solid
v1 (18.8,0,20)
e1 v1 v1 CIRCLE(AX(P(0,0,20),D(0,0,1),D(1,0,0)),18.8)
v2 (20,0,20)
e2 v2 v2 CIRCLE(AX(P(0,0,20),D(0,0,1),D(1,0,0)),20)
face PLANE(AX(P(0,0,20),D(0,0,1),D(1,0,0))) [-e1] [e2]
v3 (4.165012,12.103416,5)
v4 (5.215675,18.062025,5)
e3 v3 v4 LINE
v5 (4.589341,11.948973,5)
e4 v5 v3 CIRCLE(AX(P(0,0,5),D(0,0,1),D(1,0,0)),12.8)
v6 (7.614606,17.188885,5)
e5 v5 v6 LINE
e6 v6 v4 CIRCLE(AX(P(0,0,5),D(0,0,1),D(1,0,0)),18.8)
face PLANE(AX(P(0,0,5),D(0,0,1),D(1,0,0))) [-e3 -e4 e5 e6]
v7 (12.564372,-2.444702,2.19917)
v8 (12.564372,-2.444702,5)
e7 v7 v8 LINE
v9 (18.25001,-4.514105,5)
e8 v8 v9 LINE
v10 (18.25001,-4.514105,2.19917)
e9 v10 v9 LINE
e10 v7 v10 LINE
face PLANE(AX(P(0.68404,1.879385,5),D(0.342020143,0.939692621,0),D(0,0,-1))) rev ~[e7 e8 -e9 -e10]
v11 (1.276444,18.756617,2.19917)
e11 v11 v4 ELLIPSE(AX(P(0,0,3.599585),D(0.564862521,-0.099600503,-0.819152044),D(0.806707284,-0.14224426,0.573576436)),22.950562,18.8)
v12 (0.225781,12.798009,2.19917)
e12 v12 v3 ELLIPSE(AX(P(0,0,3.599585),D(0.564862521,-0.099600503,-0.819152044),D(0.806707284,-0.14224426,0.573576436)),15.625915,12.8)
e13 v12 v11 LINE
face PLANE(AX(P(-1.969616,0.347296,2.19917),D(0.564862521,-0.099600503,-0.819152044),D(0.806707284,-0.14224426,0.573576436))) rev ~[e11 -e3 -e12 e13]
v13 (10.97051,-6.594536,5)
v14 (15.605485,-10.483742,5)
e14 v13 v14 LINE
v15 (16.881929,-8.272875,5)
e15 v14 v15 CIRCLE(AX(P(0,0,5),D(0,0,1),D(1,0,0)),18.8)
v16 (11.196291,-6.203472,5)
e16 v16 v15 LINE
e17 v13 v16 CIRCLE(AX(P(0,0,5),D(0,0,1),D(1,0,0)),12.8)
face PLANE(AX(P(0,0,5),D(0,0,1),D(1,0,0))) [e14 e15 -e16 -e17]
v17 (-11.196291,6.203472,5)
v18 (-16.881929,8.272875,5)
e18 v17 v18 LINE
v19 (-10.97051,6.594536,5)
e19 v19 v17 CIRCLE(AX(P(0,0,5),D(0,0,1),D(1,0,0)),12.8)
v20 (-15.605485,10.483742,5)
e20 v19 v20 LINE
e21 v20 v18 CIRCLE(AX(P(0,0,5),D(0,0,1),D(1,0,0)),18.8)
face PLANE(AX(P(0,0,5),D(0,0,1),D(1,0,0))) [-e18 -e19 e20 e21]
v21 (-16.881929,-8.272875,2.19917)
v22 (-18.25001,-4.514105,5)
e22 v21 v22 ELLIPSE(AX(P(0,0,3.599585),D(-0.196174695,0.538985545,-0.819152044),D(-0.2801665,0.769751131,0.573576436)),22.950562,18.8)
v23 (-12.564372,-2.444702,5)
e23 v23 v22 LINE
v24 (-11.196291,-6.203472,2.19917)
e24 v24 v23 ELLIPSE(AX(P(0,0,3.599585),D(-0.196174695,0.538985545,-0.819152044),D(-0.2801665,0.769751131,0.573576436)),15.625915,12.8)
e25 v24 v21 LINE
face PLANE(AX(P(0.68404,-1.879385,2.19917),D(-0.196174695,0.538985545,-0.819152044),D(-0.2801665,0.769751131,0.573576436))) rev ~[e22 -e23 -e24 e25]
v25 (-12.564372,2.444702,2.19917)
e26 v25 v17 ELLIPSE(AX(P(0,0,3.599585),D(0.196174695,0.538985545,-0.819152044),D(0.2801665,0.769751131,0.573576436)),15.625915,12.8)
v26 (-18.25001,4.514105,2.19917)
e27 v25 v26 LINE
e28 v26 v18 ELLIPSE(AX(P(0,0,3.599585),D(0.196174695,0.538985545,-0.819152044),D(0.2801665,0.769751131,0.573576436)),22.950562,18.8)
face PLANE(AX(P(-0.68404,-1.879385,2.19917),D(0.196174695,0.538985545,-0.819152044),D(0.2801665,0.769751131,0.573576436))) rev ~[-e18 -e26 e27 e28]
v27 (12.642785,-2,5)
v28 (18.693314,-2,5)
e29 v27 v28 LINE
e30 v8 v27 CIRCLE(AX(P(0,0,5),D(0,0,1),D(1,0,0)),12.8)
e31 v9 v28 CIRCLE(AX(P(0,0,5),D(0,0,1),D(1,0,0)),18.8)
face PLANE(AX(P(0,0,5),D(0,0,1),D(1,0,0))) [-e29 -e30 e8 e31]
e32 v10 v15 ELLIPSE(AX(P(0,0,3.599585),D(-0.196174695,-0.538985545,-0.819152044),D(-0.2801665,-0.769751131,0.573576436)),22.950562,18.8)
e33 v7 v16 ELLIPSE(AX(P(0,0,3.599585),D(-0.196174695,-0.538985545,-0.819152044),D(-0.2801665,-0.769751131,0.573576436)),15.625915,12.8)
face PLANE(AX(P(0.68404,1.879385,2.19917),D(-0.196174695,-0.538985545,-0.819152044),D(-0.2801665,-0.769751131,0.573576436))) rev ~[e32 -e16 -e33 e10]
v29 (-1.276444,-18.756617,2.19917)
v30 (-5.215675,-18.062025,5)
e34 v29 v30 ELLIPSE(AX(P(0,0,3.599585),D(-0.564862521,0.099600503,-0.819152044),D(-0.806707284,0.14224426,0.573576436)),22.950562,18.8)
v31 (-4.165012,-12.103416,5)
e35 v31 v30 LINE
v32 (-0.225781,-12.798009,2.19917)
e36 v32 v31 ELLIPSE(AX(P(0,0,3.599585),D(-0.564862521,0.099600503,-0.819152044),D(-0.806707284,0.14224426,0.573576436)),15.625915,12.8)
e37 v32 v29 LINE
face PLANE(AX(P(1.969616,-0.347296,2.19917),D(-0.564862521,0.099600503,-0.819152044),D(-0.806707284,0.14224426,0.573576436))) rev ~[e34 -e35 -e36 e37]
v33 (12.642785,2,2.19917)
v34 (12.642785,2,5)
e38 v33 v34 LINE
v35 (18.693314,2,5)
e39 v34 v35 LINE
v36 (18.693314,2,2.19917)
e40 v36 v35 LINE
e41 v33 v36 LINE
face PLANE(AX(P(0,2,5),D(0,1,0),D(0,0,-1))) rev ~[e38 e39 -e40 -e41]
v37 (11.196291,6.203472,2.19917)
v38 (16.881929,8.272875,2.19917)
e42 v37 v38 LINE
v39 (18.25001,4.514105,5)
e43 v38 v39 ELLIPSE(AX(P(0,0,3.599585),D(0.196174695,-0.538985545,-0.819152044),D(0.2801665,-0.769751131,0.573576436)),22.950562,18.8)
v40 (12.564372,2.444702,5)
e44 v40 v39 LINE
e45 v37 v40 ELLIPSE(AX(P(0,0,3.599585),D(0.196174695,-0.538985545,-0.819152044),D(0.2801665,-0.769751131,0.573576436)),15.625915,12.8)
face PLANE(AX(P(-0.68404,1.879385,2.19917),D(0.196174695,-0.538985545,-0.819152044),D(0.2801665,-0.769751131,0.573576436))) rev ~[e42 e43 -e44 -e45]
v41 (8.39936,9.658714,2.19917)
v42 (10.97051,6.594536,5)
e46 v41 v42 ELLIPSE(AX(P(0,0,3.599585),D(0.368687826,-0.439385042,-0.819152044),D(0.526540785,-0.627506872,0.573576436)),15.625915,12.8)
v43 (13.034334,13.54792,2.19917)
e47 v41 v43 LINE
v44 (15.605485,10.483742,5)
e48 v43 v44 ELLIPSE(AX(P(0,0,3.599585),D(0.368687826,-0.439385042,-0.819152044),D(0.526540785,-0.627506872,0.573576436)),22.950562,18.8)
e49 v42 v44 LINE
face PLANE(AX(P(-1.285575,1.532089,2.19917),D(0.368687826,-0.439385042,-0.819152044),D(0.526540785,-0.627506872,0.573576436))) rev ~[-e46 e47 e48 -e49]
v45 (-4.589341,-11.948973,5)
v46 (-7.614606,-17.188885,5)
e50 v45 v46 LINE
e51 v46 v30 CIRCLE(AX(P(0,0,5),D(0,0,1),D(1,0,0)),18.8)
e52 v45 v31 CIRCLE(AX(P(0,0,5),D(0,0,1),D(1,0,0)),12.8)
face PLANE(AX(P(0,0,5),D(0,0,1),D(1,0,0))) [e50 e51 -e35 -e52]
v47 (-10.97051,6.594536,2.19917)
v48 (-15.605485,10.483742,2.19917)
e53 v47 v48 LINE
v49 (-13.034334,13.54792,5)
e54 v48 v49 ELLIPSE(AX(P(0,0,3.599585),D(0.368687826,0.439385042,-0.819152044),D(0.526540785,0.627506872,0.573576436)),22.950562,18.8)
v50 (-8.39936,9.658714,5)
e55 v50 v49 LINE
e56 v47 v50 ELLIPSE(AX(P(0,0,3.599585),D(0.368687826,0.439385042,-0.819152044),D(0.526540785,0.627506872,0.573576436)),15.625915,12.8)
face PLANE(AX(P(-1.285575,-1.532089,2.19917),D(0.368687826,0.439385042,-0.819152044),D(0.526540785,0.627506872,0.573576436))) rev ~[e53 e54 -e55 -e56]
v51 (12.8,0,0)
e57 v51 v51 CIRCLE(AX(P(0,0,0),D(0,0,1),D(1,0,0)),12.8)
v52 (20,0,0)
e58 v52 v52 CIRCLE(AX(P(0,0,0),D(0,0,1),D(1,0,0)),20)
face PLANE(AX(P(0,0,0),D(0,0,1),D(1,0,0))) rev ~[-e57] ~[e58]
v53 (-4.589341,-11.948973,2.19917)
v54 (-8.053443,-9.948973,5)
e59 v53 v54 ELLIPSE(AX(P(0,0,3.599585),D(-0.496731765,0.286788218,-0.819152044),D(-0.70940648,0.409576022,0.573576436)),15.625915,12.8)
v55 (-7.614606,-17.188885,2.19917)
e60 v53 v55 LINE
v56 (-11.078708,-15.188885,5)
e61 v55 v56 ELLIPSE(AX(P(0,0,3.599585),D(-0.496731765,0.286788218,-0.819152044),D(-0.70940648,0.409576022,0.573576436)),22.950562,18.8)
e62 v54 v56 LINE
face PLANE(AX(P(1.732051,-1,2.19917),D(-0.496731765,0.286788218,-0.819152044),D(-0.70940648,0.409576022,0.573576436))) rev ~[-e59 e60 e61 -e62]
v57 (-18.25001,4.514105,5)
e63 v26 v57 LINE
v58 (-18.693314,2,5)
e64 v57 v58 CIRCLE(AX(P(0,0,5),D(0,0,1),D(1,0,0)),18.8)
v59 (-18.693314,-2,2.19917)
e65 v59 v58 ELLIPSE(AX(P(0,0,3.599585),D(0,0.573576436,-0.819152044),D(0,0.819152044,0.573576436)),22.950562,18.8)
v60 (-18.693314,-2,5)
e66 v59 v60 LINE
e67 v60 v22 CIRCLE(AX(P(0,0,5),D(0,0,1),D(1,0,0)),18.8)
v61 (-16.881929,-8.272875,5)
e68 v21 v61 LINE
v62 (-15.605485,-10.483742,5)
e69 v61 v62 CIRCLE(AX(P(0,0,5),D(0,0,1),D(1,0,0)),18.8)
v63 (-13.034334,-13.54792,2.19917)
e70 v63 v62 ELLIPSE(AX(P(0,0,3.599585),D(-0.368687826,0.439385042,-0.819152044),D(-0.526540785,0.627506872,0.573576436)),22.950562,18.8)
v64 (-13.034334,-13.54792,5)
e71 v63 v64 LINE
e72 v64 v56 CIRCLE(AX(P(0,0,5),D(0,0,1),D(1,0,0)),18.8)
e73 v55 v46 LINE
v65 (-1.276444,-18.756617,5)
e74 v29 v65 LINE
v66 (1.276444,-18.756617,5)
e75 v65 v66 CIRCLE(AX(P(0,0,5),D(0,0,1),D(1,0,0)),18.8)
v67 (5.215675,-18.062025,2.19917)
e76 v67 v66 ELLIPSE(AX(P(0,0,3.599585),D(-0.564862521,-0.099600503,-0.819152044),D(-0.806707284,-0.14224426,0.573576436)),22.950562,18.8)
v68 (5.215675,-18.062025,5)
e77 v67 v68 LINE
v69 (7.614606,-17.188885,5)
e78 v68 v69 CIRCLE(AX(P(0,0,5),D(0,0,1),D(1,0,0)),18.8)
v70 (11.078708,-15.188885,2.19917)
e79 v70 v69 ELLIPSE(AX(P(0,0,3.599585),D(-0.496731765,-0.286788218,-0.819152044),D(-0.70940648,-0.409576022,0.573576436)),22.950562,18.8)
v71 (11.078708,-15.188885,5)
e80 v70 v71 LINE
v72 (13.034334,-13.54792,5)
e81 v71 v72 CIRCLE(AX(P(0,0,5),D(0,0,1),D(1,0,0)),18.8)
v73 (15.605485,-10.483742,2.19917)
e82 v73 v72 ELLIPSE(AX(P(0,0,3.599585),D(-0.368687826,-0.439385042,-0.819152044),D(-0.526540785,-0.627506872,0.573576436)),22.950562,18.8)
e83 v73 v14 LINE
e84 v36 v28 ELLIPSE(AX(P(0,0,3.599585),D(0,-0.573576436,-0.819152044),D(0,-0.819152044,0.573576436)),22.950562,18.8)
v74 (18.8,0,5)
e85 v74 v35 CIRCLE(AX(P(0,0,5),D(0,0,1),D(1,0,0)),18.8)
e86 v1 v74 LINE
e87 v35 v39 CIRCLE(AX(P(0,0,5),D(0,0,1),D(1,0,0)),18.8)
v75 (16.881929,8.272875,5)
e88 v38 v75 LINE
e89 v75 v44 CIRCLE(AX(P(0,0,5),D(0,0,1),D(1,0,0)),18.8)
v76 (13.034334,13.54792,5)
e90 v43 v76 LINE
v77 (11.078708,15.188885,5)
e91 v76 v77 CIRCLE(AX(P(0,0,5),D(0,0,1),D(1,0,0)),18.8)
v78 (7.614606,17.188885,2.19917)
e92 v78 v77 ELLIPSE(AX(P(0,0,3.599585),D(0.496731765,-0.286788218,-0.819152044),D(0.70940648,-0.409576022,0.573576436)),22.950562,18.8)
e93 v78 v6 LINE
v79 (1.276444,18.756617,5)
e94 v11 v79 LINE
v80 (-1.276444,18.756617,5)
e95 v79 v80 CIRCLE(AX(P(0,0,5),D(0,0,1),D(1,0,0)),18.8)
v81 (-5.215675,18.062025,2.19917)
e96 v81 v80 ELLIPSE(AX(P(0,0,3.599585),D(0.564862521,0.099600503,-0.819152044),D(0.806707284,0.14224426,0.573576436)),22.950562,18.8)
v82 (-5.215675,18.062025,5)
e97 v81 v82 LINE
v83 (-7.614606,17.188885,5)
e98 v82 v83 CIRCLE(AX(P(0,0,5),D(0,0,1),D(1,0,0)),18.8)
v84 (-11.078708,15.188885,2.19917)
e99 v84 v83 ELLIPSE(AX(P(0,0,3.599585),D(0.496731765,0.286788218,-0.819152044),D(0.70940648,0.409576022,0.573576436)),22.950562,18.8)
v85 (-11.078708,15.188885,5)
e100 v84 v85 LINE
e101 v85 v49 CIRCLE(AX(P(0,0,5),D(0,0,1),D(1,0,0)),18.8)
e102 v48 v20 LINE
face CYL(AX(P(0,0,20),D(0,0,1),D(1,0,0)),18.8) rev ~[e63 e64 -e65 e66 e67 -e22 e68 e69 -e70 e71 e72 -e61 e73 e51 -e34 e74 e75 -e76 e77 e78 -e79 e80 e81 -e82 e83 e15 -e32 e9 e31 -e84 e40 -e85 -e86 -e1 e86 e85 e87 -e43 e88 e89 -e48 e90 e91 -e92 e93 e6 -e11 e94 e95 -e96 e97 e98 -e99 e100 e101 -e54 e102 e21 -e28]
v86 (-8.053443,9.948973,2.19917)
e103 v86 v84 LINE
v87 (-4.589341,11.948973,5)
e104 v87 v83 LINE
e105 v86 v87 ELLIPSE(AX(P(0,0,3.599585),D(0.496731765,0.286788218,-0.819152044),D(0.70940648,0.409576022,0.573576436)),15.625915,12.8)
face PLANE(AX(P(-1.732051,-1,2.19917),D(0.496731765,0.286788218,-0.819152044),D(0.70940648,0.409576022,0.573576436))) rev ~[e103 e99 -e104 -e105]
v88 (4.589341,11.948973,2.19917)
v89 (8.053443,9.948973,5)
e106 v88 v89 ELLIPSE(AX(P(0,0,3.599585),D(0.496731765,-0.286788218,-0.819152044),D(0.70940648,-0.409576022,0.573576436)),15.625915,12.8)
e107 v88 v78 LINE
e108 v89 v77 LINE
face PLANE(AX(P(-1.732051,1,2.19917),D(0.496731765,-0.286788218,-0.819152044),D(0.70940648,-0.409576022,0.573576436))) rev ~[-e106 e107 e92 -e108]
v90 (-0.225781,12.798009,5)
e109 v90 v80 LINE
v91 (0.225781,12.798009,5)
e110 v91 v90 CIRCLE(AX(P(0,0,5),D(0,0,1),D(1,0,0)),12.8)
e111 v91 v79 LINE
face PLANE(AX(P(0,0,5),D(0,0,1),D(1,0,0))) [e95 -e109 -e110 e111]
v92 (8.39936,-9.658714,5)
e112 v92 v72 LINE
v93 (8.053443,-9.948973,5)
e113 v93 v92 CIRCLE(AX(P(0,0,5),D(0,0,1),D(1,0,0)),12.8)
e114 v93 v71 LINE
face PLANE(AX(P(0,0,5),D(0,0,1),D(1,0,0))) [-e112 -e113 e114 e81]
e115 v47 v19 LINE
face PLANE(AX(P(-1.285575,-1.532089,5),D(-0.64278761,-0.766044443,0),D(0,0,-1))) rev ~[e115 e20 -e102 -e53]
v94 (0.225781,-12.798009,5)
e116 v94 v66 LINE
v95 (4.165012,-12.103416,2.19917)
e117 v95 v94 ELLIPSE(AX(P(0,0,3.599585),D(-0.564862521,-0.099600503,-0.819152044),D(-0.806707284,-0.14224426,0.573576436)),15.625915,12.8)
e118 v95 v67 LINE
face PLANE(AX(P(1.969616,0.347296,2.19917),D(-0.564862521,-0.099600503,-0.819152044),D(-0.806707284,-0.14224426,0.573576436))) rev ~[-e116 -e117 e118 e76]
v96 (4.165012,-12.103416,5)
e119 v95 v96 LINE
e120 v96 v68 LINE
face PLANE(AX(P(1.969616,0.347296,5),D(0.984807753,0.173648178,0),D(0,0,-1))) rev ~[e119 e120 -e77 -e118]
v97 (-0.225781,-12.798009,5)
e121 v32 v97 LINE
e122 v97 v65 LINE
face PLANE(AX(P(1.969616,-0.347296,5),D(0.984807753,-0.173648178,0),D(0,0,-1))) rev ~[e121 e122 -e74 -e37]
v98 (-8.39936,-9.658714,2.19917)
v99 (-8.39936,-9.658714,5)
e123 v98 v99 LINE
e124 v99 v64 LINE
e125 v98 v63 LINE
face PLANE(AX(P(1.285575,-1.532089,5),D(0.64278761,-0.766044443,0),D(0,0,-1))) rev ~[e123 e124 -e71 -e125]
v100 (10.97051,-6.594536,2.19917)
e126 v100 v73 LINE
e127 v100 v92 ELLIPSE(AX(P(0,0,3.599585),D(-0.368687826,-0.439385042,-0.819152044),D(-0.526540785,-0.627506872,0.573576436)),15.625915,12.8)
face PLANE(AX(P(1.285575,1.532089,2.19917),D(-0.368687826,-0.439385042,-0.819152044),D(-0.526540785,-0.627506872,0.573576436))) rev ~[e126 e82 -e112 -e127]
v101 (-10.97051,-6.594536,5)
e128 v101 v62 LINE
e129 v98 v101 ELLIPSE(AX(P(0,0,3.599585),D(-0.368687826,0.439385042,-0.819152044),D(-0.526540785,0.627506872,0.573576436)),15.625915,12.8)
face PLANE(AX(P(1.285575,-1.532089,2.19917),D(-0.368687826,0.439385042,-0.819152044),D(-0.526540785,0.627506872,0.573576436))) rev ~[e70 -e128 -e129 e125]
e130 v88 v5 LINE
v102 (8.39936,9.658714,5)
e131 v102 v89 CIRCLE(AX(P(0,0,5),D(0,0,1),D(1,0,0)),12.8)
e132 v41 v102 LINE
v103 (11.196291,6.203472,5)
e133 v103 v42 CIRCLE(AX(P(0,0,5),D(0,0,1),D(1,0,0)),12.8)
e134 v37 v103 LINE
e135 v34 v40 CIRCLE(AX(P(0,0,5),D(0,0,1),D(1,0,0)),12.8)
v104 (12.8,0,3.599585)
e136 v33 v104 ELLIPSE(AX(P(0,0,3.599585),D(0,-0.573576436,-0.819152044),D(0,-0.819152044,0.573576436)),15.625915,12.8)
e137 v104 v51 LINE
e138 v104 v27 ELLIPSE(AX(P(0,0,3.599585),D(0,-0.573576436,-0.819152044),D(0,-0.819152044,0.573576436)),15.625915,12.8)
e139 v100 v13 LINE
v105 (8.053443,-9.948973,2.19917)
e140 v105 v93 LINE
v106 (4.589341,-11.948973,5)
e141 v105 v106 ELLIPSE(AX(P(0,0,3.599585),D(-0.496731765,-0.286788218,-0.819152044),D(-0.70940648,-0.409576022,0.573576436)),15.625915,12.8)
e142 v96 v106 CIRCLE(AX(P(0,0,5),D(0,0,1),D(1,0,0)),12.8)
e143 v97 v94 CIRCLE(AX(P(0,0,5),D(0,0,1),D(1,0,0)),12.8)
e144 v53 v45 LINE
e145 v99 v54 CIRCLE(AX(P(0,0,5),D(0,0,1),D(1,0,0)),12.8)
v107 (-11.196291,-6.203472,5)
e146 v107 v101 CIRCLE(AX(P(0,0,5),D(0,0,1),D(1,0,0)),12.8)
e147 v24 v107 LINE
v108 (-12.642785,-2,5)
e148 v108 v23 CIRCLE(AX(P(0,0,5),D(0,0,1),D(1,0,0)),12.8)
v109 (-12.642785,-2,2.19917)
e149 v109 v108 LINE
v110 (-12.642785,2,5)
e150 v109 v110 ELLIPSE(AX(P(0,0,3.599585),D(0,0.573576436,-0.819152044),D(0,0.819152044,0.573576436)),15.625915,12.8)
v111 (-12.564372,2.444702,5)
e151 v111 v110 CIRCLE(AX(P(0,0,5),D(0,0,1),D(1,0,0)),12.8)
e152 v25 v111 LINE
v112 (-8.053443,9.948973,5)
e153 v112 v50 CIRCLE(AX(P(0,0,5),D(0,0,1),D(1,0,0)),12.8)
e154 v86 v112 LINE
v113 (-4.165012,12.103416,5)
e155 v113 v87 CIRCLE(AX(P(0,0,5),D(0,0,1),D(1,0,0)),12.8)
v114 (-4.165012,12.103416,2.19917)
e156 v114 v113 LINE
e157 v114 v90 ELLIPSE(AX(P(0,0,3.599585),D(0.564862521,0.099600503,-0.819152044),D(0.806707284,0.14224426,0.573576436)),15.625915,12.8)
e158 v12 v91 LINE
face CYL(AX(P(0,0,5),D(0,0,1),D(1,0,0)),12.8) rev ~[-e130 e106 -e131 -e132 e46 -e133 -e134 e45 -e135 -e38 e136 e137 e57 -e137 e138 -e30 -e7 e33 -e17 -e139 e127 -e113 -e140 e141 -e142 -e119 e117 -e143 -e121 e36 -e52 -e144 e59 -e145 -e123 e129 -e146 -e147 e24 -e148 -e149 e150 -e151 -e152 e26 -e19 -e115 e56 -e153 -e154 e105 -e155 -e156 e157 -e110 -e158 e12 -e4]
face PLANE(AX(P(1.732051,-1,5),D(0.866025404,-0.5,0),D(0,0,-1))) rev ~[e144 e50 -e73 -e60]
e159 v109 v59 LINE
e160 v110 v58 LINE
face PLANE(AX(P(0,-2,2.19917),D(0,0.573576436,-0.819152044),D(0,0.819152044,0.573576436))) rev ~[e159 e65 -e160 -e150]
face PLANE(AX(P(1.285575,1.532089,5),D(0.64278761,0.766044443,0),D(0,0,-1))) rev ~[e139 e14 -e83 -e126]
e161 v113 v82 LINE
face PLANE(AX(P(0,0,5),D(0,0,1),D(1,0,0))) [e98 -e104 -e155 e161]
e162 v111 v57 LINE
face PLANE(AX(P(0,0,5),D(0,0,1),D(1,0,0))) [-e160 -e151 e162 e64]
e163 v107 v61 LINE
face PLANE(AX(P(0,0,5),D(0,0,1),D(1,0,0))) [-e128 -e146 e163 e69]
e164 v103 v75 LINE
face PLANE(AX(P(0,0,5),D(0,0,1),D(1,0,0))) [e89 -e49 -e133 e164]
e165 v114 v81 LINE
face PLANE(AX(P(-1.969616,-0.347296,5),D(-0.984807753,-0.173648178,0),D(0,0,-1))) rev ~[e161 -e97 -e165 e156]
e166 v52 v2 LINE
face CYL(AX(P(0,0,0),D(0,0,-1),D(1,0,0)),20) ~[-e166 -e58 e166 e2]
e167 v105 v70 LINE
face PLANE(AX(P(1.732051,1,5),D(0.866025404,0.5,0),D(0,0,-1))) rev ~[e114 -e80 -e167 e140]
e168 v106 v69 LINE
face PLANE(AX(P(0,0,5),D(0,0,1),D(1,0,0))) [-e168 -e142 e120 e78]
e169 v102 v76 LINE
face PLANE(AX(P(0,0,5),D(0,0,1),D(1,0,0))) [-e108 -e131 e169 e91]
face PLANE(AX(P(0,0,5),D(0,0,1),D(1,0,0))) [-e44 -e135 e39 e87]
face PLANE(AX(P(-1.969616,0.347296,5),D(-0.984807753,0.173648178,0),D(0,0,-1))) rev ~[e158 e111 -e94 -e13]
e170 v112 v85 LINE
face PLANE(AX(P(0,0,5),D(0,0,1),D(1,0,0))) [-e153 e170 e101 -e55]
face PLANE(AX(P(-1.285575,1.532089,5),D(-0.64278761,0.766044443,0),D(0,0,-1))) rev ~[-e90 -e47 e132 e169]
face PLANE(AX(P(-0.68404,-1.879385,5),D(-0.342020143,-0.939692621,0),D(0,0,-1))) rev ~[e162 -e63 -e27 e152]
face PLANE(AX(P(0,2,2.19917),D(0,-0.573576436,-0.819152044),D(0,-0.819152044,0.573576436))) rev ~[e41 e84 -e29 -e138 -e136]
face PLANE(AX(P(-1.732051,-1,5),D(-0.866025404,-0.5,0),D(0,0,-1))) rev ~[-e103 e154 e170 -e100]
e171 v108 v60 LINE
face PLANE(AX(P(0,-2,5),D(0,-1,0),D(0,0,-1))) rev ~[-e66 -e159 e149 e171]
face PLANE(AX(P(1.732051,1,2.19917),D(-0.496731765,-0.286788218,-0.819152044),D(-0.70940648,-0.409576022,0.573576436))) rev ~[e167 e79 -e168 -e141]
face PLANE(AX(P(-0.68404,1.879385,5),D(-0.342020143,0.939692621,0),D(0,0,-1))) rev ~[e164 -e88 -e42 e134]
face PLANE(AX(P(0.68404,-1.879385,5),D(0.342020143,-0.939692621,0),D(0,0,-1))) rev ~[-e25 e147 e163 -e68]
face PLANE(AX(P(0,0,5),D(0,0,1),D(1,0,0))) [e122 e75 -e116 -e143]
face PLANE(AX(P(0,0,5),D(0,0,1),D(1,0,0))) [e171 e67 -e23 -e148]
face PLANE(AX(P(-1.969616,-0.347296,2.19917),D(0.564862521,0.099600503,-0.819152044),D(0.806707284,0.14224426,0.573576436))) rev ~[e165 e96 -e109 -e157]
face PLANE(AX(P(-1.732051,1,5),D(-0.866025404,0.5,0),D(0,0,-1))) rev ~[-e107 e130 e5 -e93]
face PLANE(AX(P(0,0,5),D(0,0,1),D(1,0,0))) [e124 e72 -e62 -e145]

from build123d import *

# Parameters (mm, degrees)
F0_R            = 20
F1_DEPTH        = 20
F2_R            = 18.8
F3_DEPTH        = 15
F4_R            = 12.8
F5_DEPTH        = 25
F7_END_RADIUS   = 18.8
F7_REACH        = 24.884098355
F7_COPIES_COUNT = 18


# Not quite as in the source:
# - a pattern or mirror of a feature is missing from the dataset's text; its kind, count and spacing are read off the source's solid


with BuildPart() as f1:
    # F0 (on Top) → F1 (new body)
    with BuildSketch(Plane.XY):
        Circle(F0_R)
    extrude(amount=F1_DEPTH)

    # F2 (on face) → F3 (cut)
    with BuildSketch(Plane.XY.offset(20)):
        Circle(F2_R)
    extrude(amount=-F3_DEPTH, mode=Mode.SUBTRACT)

    # F4 (on face) → F5 (cut)
    with BuildSketch(Plane.XY.offset(5)):
        Circle(F4_R)
    extrude(amount=-F5_DEPTH, mode=Mode.SUBTRACT)

    f7_end = (Plane.XY.offset(12.5) * Cylinder(F7_END_RADIUS, 169.7681967101, mode=Mode.PRIVATE)).faces().sort_by_distance((-18.8, 0, 12.5))[0]
    # F6 (on Right) → F7 (cut, up to the whole of a round face its end follows)
    with BuildSketch(Plane.YZ):
        Polygon((-2, 5), (-2, 2.1991698472), (0, 3.5995849236), (2, 5), align=None)
    f7_long = extrude(amount=-F7_REACH, mode=Mode.PRIVATE)
    f7 = split(f7_long, bisect_by=f7_end, keep=Keep.BOTTOM, mode=Mode.PRIVATE)
    add(f7, mode=Mode.SUBTRACT)

    # F7_copies: F7 ×18 about axis
    f7_copies_axis = Axis((0, 0, 0), (0, 0, 1))
    for i in range(1, F7_COPIES_COUNT):
        add(f7.rotate(f7_copies_axis, i * 360 / F7_COPIES_COUNT), mode=Mode.SUBTRACT)


solid = f1.part
